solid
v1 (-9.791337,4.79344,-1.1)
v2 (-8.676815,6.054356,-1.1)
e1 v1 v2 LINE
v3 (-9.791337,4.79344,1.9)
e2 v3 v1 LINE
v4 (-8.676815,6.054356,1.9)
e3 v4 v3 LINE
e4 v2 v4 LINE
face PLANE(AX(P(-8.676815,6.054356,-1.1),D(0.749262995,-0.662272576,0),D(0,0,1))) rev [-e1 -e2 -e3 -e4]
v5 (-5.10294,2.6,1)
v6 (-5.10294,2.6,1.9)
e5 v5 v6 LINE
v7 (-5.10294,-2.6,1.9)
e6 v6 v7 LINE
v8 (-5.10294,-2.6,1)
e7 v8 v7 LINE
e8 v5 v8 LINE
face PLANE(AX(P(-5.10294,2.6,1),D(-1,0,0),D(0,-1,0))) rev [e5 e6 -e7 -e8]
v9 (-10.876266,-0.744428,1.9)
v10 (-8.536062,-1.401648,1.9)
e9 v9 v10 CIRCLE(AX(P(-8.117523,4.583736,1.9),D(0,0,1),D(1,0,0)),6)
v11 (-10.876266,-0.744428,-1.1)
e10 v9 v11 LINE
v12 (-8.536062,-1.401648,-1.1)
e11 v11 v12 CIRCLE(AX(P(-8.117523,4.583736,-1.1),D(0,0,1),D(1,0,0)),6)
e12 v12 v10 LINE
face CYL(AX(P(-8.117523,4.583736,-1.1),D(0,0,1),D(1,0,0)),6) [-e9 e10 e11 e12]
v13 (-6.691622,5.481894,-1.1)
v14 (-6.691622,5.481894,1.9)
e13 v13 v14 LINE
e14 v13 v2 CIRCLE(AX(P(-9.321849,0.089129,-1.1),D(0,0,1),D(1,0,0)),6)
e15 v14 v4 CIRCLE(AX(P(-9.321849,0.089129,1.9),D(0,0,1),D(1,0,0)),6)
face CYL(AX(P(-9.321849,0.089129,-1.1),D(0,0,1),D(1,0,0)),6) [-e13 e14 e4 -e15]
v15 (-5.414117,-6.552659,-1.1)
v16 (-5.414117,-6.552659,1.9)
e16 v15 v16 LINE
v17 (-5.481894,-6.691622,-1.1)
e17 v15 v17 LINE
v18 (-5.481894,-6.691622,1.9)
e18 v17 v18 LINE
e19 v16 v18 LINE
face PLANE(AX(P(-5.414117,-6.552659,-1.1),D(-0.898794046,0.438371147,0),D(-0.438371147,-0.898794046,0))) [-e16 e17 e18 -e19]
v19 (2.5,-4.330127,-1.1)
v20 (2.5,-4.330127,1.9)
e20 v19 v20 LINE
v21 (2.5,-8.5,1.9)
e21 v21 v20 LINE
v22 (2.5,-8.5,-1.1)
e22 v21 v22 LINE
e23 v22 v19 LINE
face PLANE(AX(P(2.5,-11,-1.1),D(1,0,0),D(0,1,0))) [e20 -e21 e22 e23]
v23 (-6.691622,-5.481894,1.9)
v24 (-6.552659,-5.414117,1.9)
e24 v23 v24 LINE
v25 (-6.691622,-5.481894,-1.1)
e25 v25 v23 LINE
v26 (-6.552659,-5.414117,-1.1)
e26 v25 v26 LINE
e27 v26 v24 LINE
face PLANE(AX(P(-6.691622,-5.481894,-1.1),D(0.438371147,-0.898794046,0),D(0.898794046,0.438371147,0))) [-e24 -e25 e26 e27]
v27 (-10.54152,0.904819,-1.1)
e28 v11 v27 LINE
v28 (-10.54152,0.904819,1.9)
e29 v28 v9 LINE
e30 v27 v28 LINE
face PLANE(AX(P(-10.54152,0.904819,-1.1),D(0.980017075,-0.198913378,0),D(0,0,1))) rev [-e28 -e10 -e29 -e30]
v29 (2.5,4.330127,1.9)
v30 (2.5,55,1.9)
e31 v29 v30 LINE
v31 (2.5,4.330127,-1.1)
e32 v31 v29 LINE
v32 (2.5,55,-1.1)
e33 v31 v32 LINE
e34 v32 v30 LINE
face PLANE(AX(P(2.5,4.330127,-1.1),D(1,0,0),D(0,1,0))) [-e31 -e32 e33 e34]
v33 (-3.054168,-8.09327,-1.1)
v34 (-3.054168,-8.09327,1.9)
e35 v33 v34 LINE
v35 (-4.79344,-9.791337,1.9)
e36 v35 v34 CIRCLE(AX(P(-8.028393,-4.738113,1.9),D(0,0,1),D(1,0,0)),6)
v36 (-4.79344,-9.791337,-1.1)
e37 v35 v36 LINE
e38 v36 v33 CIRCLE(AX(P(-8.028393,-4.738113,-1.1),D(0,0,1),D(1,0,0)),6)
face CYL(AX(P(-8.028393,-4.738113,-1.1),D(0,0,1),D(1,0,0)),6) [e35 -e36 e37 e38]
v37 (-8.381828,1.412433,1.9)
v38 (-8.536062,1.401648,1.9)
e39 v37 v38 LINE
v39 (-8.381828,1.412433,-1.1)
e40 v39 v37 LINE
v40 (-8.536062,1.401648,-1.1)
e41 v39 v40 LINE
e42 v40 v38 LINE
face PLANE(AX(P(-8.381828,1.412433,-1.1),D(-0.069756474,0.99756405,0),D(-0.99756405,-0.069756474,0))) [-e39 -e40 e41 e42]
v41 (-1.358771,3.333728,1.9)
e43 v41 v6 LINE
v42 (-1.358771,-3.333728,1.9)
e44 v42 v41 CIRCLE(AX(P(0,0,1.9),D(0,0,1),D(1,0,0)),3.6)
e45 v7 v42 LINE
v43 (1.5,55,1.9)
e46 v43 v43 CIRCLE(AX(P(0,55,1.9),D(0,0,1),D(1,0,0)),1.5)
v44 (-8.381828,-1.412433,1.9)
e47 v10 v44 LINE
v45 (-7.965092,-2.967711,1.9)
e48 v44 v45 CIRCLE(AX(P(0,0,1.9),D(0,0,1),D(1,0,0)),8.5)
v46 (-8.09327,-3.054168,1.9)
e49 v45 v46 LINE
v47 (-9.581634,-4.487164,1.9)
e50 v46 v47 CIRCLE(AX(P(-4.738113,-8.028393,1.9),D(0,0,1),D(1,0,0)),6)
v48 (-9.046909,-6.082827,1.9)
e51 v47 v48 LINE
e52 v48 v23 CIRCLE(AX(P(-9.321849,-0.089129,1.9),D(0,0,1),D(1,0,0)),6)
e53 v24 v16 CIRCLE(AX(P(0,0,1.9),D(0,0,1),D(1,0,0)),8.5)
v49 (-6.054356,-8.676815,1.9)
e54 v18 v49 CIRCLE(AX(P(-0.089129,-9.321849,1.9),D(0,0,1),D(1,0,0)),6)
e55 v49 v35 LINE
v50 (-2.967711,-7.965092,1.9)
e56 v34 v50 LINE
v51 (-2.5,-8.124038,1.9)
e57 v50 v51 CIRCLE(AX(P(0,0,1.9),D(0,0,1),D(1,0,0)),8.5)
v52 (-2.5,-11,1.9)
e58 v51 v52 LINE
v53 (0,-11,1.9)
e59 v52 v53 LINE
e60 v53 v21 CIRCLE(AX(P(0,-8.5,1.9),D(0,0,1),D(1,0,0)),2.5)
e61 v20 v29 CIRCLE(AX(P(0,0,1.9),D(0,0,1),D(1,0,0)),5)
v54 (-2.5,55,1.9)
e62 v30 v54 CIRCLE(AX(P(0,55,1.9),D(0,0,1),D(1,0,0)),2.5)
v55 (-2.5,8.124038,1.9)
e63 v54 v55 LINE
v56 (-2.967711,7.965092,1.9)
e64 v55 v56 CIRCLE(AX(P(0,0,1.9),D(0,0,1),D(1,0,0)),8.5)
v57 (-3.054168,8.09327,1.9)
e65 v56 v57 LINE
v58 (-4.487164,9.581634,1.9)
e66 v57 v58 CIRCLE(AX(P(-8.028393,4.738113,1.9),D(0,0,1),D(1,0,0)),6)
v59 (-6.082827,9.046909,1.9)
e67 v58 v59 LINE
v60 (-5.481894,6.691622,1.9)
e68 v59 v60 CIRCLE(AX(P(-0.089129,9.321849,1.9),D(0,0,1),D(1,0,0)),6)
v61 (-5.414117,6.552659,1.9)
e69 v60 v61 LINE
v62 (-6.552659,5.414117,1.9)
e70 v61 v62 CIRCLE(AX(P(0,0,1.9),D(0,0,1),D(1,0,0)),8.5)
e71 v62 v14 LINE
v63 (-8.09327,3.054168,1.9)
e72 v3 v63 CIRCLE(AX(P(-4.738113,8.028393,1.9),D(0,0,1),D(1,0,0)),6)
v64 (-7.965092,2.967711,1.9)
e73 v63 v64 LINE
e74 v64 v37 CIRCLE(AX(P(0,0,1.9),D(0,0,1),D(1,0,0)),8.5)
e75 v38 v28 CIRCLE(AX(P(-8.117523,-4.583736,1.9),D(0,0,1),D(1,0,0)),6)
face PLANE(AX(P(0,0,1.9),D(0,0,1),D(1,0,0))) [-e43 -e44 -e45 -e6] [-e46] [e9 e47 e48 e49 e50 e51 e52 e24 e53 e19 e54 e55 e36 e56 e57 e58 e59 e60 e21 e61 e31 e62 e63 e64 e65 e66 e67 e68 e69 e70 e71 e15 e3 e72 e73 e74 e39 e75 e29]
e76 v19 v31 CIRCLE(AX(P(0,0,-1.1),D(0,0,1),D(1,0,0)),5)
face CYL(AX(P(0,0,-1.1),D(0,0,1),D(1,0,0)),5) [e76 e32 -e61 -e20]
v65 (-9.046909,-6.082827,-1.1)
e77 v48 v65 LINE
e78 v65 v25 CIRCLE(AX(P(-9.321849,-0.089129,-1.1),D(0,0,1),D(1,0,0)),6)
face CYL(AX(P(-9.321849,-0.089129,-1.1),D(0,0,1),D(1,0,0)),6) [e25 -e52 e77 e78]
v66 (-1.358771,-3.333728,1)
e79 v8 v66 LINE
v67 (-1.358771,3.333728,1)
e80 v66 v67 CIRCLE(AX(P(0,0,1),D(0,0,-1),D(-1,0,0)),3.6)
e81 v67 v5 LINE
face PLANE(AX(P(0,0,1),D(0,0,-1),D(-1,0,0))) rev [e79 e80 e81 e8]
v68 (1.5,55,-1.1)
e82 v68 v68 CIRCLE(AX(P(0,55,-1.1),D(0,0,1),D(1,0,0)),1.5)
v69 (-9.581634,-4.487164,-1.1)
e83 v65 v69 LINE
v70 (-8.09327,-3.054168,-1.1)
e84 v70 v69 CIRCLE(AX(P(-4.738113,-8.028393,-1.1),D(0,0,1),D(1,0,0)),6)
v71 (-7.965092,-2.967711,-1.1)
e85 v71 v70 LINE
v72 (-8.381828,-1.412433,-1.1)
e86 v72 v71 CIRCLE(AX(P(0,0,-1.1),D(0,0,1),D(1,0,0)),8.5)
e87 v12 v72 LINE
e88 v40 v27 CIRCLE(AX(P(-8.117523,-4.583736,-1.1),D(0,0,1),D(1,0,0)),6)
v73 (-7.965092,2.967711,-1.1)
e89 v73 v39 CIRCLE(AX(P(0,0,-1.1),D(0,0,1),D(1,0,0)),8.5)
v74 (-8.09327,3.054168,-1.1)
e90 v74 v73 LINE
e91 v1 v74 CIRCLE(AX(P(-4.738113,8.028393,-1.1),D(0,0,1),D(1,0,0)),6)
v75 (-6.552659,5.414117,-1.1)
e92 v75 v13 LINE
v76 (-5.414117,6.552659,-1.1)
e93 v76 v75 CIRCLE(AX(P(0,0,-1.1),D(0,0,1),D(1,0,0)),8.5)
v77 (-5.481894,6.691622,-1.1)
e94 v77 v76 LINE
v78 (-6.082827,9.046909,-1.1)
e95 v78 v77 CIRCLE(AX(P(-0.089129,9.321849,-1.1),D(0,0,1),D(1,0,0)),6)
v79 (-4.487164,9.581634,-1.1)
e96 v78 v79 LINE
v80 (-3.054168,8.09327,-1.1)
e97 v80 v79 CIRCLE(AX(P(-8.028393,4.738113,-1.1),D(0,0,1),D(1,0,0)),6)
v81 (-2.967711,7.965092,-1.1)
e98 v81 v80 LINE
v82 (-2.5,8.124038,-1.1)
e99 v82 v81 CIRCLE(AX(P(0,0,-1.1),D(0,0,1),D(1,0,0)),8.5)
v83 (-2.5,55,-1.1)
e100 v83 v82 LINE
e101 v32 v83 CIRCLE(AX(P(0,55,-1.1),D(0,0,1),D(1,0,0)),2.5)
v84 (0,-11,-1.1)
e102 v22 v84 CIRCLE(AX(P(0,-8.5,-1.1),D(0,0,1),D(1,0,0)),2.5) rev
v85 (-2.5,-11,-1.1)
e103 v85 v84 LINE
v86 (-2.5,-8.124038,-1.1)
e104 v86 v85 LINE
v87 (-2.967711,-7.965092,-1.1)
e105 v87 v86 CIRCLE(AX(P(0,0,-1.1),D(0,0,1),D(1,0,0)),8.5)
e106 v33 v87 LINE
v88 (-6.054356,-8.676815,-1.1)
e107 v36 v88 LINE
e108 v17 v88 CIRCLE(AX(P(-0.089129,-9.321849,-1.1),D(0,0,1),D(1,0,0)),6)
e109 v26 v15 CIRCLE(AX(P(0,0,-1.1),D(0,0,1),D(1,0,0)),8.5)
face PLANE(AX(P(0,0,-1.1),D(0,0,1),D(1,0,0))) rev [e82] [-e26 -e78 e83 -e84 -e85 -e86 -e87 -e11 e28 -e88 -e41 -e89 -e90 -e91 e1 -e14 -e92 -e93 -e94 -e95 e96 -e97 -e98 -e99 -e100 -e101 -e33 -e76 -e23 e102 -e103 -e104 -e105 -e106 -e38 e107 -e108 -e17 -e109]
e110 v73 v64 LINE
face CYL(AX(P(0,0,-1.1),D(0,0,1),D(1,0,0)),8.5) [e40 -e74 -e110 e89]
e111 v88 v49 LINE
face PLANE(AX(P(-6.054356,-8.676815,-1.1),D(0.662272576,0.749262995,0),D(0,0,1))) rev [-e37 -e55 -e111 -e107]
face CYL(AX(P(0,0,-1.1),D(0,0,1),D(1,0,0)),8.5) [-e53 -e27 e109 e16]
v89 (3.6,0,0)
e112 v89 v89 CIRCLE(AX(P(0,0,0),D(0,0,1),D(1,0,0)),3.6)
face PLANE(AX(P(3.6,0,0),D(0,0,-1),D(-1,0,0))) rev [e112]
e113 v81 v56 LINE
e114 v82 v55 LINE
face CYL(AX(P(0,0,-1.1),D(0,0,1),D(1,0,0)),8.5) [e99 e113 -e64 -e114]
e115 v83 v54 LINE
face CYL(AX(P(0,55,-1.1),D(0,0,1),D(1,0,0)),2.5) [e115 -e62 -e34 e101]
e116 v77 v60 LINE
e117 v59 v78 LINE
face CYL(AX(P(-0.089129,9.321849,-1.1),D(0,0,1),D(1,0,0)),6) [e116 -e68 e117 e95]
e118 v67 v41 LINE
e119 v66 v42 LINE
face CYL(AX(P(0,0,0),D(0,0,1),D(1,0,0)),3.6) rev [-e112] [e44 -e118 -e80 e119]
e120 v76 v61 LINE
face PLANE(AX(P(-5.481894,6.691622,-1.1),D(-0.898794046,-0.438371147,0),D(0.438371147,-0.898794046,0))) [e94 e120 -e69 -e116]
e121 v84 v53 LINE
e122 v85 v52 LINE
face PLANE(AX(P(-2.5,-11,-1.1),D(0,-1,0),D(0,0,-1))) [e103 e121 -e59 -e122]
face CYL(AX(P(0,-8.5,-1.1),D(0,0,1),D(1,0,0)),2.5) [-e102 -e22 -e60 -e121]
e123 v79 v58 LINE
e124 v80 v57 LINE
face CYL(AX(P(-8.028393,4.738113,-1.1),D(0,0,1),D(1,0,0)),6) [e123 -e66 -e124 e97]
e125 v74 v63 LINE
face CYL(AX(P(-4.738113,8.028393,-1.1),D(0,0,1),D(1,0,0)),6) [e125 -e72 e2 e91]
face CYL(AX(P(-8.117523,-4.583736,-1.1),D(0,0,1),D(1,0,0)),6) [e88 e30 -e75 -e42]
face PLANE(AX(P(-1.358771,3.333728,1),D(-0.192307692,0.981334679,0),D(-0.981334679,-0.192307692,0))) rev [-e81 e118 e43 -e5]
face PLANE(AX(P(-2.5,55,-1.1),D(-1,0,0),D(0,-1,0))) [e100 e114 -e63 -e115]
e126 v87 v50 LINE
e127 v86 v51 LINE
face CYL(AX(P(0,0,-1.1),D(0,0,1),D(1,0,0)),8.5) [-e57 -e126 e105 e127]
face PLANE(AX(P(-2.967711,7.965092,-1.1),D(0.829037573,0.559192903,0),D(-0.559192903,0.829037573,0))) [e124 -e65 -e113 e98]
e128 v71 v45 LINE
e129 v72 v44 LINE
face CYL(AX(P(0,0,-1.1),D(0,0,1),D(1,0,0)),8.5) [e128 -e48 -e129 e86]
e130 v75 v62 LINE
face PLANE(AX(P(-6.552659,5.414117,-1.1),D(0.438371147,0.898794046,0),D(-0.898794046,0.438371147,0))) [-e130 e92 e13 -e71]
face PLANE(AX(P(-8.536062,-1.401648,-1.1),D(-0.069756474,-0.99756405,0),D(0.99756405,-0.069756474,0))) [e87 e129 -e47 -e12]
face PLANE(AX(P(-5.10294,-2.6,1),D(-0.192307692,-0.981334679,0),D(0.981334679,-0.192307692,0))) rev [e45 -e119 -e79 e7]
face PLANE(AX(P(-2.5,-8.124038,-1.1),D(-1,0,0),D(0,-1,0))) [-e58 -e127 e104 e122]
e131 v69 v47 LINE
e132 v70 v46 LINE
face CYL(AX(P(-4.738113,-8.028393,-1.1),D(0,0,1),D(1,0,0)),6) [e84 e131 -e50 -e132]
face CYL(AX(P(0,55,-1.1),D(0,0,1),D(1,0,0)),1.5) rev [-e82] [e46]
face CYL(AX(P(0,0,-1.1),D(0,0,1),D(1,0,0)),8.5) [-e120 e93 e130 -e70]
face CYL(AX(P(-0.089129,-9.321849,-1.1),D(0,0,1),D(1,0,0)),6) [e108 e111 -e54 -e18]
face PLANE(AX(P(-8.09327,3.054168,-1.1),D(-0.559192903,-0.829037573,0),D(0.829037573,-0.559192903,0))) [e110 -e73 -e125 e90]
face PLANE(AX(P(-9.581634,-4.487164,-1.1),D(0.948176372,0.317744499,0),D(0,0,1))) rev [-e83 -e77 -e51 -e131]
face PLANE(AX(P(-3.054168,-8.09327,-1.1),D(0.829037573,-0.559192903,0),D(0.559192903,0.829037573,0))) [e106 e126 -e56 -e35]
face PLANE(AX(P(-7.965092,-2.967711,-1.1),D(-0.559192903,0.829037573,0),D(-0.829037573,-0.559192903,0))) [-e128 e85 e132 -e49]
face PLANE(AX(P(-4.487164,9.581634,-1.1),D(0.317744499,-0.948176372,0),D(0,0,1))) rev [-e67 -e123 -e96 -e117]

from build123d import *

# Parameters (mm, degrees)
SKETCH1_R           = 1.5
BOSS_EXTRUDE1_DEPTH = 3
CUT_EXTRUDE2_DEPTH  = 0.9
SKETCH5_W           = 3.6
SKETCH5_H           = 3
FILLET1_R           = 2.5


with BuildPart() as part:
    # Sketch1 → Boss-Extrude1 (new body)
    with BuildSketch(Plane.XY.offset(1.9)):
        with BuildLine():
            Line((2.5, -11), (2.5, -4.330127019))
            ThreePointArc((2.5, -4.330127019), (5, 0), (2.5, 4.330127019))
            Line((2.5, 4.330127019), (2.5, 55))
            ThreePointArc((2.5, 55), (0, 57.5), (-2.5, 55))
            Line((-2.5, 55), (-2.5, 8.124038405))
            ThreePointArc((-2.5, 8.124038405), (-2.735010245, 8.047963653), (-2.967710696, 7.965092167))
            Line((-2.967710696, 7.965092167), (-3.054167872, 8.093270203))
            ThreePointArc((-3.054167872, 8.093270203), (-4.342095244, 9.472160372), (-5.994566265, 10.382893341))
            ThreePointArc((-5.994566265, 10.382893341), (-6.032083889, 8.496444973), (-5.481893659, 6.691622066))
            Line((-5.481893659, 6.691622066), (-5.414116812, 6.552658937))
            ThreePointArc((-5.414116812, 6.552658937), (-6.01040764, 6.01040764), (-6.552658937, 5.414116812))
            Line((-6.552658937, 5.414116812), (-6.691622066, 5.481893659))
            ThreePointArc((-6.691622066, 5.481893659), (-8.496444973, 6.032083889), (-10.382893341, 5.994566265))
            ThreePointArc((-10.382893341, 5.994566265), (-9.472160372, 4.342095244), (-8.093270203, 3.054167872))
            Line((-8.093270203, 3.054167872), (-7.965092167, 2.967710696))
            ThreePointArc((-7.965092167, 2.967710696), (-8.210369523, 2.199961883), (-8.381827508, 1.41243323))
            Line((-8.381827508, 1.41243323), (-8.536061531, 1.401648136))
            ThreePointArc((-8.536061531, 1.401648136), (-10.374179133, 0.975715399), (-11.989132531, 0))
            ThreePointArc((-11.989132531, 0), (-10.374179133, -0.975715399), (-8.536061531, -1.401648136))
            Line((-8.536061531, -1.401648136), (-8.381827508, -1.41243323))
            ThreePointArc((-8.381827508, -1.41243323), (-8.210369523, -2.199961883), (-7.965092167, -2.967710696))
            Line((-7.965092167, -2.967710696), (-8.093270203, -3.054167872))
            ThreePointArc((-8.093270203, -3.054167872), (-9.472160372, -4.342095244), (-10.382893341, -5.994566265))
            ThreePointArc((-10.382893341, -5.994566265), (-8.496444973, -6.032083889), (-6.691622066, -5.481893659))
            Line((-6.691622066, -5.481893659), (-6.552658937, -5.414116812))
            ThreePointArc((-6.552658937, -5.414116812), (-6.01040764, -6.01040764), (-5.414116812, -6.552658937))
            Line((-5.414116812, -6.552658937), (-5.481893659, -6.691622066))
            ThreePointArc((-5.481893659, -6.691622066), (-6.032083889, -8.496444973), (-5.994566265, -10.382893341))
            ThreePointArc((-5.994566265, -10.382893341), (-4.342095244, -9.472160372), (-3.054167872, -8.093270203))
            Line((-3.054167872, -8.093270203), (-2.967710696, -7.965092167))
            ThreePointArc((-2.967710696, -7.965092167), (-2.735010245, -8.047963653), (-2.5, -8.124038405))
            Line((-2.5, -8.124038405), (-2.5, -11))
            Line((-2.5, -11), (2.5, -11))
        make_face()
        with Locations((0, 55)):
            Circle(SKETCH1_R, mode=Mode.SUBTRACT)
    extrude(amount=-BOSS_EXTRUDE1_DEPTH)

    # Sketch4 → Cut-Extrude2 (cut)
    with BuildSketch(Plane.XY.offset(1.9)):
        with BuildLine():
            Line((-5.102940329, -2.6), (-1.358771093, -3.333727811))
            ThreePointArc((-1.358771093, -3.333727811), (-3.6, 0), (-1.358771093, 3.333727811))
            Line((-1.358771093, 3.333727811), (-5.102940329, 2.6))
            Line((-5.102940329, 2.6), (-5.102940329, -2.6))
        make_face()
    extrude(amount=-CUT_EXTRUDE2_DEPTH, mode=Mode.SUBTRACT)

    # Sketch5 → Cut-Revolve1 (revolve, cut)
    with BuildSketch(Plane(origin=(0, 0, 0), x_dir=(1, 0, 0), z_dir=(0, 1, 0))):
        with Locations((1.8, -1.5)):
            Rectangle(SKETCH5_W, SKETCH5_H)
    revolve(axis=Axis((0, 0, 0), (0, 0, 1)), mode=Mode.SUBTRACT)

    # Chamfer1
    # the kernel refuses this chamfer: 1.996823512, 1.412365401 mm, written as the material it takes off along each edge
    with BuildSketch(Plane(origin=(-5.994566265, -10.382893341, 6.307600342), x_dir=(0.8971018613245074, 0.44182377754949315, 0), z_dir=(0, 0, -1)), Plane(origin=(-10.382893341, -5.994566265, 6.307600342), x_dir=(0.9978248904640776, -0.06592031530834441, 0), z_dir=(0, 0, -1)), Plane(origin=(-11.989132531, 0, 6.307600342), x_dir=(0.8311815460161414, -0.5560011129145489, 0), z_dir=(0, 0, -1))) as chamfer1_piece_1:
        with BuildLine():
            Line((1.33889649, 0), (0.700148491, -1.556942978))
            ThreePointArc((0.700148491, -1.556942978), (0.305807457, -0.828670891), (0, 0))
            ThreePointArc((0, 0), (0.684607685, 0.037444556), (1.33889649, 0))
        make_face()
    extrude(amount=11.815200684, mode=Mode.SUBTRACT)
    with BuildSketch(Plane(origin=(-10.382893341, 5.994566265, 6.307600342), x_dir=(0.9993864811320993, 0.035023725250178994, 0), z_dir=(0, 0, -1)), Plane(origin=(-5.994566265, 10.382893341, 6.307600342), x_dir=(0.883005943484212, -0.4693618047642527, 0), z_dir=(0, 0, -1))) as chamfer1_piece_2:
        with BuildLine():
            Line((1.707126049, 0), (0.549125448, 1.221108125))
            ThreePointArc((0.549125448, 1.221108125), (0.246629708, 0.639737105), (0, 0))
            ThreePointArc((0, 0), (0.881190909, -0.060960877), (1.707126049, 0))
        make_face()
    extrude(amount=11.815200684, mode=Mode.SUBTRACT)

    # Fillet1
    fillet1_edges = [part.edges().sort_by_distance(p)[0] for p in [
        (2.5, -11, 0.4),
    ]]
    fillet(fillet1_edges, radius=FILLET1_R)


solid = part.part
